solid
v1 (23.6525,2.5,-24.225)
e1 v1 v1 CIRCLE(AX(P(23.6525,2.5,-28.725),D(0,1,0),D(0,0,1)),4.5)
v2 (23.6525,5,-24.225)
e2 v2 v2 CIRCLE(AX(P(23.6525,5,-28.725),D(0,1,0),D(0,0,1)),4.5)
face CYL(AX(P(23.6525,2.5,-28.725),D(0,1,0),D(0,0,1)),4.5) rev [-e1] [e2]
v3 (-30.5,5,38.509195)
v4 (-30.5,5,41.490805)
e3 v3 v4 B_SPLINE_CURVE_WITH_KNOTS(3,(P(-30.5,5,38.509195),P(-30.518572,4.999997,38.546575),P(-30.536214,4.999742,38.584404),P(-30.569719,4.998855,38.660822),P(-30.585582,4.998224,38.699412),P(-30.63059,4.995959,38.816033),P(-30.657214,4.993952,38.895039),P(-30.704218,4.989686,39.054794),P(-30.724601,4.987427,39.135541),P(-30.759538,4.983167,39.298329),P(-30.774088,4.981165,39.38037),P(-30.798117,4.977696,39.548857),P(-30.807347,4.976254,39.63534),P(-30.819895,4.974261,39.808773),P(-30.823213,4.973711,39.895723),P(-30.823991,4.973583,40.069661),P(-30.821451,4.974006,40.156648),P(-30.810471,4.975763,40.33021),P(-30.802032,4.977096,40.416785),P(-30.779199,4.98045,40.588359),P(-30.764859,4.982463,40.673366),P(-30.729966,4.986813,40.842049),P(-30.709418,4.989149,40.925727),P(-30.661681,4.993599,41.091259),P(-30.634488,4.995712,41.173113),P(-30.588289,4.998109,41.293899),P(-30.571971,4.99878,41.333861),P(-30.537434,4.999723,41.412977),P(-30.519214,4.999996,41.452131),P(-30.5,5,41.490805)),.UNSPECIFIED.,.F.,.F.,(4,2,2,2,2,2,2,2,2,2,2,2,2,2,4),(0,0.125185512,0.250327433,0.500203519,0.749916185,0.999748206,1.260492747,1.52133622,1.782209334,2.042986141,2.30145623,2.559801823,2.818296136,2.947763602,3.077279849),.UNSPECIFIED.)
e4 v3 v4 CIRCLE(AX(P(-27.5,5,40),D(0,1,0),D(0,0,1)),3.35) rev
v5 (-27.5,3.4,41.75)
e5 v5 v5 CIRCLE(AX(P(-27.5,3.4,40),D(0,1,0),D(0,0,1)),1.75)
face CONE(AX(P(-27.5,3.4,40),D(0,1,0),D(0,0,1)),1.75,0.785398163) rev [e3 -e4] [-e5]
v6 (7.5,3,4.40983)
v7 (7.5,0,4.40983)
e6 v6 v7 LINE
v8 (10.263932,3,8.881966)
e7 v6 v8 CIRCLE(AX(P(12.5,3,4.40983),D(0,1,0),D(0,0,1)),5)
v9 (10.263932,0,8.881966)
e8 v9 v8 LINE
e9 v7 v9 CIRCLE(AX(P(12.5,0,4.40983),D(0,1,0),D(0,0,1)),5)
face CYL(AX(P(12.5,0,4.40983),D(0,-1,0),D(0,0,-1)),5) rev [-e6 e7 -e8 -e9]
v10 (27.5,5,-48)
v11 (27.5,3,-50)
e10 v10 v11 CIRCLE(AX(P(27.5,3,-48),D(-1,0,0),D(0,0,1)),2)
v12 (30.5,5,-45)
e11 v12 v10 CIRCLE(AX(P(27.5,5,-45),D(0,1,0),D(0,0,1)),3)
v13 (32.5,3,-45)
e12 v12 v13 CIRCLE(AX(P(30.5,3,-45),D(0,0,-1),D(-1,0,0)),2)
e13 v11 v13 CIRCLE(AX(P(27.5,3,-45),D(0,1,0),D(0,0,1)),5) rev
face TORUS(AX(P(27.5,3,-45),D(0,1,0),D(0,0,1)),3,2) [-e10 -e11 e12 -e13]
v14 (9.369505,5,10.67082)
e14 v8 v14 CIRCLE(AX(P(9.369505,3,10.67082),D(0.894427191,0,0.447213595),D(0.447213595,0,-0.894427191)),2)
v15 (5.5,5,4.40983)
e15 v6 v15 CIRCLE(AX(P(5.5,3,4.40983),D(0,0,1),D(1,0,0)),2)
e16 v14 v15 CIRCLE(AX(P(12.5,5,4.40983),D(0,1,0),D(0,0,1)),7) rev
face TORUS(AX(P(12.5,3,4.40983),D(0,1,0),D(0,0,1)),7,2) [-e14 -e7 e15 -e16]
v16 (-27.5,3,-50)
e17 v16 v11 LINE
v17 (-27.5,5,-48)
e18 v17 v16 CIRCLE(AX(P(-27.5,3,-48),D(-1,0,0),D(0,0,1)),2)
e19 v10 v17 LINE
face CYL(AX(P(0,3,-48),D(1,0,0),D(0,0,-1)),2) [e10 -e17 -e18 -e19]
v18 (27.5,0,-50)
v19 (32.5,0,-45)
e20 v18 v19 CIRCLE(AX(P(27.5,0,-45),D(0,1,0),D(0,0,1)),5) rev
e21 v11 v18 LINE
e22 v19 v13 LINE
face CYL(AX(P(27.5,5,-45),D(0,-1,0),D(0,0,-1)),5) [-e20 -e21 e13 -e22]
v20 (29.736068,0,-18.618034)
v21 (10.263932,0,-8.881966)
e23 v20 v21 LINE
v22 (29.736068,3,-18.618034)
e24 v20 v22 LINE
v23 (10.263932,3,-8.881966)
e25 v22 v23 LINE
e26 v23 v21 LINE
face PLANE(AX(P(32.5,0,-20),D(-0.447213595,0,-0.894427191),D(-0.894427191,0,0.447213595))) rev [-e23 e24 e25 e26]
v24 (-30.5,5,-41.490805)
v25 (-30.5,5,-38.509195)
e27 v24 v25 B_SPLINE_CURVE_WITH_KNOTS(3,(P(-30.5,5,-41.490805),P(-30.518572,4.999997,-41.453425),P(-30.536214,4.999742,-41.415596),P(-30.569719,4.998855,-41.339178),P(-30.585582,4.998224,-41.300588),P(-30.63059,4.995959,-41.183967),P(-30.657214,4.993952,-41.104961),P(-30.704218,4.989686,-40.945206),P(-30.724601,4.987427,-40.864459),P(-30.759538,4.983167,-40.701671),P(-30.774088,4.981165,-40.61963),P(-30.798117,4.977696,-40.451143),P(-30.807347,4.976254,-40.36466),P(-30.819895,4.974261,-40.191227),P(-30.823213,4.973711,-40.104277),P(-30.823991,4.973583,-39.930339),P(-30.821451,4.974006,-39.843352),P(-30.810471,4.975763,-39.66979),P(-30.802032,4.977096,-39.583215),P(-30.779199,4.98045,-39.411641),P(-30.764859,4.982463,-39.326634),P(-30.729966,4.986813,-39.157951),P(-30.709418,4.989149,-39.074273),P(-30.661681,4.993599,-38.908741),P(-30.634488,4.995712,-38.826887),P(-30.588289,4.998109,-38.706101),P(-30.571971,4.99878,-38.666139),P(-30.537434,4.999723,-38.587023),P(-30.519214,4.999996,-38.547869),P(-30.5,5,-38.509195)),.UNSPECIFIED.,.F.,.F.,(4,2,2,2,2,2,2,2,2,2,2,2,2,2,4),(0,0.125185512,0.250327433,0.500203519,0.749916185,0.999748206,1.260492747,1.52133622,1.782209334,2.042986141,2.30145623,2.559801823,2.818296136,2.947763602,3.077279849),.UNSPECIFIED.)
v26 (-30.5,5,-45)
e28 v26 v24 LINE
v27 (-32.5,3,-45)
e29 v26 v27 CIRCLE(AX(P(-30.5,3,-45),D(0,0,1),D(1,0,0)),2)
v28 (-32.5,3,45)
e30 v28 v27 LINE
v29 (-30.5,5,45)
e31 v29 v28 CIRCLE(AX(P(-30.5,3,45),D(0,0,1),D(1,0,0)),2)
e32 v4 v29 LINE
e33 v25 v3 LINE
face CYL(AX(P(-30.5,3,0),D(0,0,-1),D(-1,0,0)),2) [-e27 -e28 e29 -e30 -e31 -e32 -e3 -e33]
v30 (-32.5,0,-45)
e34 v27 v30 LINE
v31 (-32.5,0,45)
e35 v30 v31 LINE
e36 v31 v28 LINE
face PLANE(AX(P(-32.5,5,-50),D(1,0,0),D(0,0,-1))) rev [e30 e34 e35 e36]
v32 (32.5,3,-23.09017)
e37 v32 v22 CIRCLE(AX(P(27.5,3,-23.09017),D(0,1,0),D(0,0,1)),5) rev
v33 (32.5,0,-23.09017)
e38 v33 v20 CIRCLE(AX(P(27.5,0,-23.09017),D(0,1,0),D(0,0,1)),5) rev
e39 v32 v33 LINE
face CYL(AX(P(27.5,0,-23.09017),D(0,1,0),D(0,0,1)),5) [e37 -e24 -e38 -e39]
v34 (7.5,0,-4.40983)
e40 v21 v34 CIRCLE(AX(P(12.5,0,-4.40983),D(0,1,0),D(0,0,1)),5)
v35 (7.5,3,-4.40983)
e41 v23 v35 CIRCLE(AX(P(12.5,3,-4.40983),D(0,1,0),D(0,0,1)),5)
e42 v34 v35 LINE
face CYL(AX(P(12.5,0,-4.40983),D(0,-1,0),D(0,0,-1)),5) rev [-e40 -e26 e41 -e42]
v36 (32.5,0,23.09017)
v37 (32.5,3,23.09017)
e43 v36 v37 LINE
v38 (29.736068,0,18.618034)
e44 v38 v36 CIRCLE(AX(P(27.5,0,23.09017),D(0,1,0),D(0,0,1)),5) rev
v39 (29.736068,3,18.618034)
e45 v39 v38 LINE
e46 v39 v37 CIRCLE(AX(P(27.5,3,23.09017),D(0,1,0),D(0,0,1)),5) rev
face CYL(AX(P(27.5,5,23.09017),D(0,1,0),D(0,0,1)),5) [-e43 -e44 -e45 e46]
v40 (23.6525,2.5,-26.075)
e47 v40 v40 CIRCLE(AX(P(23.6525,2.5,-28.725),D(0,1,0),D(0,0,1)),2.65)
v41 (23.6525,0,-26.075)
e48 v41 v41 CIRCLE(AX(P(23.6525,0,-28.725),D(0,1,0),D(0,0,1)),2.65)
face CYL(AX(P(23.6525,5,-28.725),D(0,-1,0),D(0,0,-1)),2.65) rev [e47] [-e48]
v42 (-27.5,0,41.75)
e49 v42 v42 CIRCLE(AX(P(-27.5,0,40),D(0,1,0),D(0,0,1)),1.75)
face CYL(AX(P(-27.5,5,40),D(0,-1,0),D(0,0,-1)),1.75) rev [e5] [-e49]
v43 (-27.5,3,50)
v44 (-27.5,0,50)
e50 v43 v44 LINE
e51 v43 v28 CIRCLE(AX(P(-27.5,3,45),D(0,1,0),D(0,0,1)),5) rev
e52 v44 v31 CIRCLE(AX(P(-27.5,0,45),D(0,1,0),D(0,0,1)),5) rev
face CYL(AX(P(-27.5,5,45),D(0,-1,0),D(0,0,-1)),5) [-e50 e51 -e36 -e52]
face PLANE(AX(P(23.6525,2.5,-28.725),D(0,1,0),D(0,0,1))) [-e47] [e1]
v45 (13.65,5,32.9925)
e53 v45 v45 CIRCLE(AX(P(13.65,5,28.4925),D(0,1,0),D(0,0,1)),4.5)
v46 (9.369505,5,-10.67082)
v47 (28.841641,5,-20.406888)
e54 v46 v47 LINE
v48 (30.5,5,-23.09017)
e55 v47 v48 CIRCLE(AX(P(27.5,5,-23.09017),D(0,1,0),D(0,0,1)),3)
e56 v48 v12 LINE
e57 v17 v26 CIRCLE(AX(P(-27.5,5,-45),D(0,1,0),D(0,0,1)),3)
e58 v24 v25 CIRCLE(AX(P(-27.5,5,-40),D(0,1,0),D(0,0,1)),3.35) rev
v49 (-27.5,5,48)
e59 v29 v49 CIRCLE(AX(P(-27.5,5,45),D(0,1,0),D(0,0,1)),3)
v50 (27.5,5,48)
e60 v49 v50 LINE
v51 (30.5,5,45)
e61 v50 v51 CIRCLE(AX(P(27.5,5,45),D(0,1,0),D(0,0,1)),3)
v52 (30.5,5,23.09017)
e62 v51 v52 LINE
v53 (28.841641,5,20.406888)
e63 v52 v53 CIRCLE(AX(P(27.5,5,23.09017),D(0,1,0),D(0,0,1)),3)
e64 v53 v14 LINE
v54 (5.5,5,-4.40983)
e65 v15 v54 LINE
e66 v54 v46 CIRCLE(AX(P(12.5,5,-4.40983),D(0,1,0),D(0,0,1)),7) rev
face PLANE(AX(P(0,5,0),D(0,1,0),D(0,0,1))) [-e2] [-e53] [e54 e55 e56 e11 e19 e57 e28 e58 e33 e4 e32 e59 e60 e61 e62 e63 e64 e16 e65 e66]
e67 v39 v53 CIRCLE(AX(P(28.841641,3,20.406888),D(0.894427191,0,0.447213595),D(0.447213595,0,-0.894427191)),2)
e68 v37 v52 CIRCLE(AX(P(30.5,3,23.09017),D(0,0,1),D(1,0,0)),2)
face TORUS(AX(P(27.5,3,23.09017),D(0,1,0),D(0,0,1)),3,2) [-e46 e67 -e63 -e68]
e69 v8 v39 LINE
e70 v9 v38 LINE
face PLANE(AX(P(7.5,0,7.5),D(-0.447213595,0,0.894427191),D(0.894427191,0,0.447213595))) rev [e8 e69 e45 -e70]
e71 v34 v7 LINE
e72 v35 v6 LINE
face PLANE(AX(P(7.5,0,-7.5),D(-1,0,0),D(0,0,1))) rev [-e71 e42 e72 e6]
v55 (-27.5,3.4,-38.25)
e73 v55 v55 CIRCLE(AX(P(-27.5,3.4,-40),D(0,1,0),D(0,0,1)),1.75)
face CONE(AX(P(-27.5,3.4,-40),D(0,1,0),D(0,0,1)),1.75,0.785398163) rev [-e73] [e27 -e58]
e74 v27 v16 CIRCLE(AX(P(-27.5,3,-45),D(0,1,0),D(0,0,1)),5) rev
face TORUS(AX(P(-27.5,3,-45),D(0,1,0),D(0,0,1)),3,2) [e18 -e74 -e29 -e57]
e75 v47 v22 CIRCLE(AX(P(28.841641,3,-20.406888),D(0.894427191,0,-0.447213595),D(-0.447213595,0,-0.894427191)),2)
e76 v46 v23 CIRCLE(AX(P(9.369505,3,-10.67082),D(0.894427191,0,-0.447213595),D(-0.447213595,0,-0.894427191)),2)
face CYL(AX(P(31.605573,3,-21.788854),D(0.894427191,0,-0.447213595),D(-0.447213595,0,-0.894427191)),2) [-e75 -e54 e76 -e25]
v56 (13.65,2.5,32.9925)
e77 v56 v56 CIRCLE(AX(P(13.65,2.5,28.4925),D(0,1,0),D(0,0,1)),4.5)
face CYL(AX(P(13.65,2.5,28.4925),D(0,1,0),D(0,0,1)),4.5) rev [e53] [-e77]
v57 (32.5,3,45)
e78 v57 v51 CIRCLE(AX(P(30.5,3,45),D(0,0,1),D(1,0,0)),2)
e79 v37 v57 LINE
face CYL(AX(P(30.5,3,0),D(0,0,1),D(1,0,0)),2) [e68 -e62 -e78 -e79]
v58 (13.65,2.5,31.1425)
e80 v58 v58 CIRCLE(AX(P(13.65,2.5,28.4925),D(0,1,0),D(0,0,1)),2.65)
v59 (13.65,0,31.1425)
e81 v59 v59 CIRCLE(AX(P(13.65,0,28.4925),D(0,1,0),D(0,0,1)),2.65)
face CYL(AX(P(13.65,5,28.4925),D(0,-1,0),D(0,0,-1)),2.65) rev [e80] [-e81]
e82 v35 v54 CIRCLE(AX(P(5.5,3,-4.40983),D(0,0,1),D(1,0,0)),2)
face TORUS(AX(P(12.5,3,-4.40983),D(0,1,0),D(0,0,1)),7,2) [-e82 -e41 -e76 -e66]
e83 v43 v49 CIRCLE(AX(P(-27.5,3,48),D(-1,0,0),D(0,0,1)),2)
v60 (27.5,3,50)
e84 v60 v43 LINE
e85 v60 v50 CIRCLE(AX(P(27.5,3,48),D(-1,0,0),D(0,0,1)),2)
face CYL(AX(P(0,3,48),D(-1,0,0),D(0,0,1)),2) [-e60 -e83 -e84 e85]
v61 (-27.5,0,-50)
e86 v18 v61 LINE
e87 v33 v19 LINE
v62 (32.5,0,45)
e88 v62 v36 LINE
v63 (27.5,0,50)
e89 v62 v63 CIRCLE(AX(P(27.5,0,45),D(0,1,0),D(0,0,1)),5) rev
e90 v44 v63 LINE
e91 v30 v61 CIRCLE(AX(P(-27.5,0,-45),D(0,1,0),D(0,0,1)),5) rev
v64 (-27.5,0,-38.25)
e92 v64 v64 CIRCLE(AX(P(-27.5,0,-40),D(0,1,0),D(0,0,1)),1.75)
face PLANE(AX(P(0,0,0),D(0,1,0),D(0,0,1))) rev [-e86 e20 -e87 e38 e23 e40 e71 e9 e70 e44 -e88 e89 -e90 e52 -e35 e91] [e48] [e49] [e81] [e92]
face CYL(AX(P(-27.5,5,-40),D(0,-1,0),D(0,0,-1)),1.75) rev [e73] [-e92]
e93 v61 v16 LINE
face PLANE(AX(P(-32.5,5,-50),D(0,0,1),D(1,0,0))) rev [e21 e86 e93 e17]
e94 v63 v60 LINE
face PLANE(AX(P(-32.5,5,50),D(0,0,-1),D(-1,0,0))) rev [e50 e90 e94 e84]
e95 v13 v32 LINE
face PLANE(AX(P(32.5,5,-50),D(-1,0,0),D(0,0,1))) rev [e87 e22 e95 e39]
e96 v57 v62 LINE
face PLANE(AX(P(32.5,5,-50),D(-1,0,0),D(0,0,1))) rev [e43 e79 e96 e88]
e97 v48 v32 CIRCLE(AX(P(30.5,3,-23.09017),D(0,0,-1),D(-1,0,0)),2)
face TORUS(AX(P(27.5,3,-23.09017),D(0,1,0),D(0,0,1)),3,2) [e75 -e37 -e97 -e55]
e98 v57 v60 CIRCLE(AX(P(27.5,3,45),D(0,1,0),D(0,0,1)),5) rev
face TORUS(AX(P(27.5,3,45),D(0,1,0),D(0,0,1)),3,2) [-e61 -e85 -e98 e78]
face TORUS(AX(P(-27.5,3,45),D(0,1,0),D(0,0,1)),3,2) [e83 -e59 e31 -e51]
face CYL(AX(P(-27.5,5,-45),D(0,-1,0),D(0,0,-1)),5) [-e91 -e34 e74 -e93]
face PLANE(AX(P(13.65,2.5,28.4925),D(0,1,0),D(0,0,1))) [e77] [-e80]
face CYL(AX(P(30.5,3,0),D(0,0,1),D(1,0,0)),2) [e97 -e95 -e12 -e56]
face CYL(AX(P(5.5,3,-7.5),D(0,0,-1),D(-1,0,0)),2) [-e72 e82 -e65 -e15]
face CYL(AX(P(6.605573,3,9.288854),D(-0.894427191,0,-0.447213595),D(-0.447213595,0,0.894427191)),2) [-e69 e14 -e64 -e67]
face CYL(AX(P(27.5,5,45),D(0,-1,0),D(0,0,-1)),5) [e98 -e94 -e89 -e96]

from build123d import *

# Parameters (mm, degrees)
SKETCH2_W           = 65
SKETCH2_H           = 100
SKETCH2_R           = 1.75
SKETCH2_R_2         = 2.65
BOSS_EXTRUDE1_DEPTH = 5
SKETCH3_R           = 4.5
CUT_EXTRUDE1_DEPTH  = 2.5
FILLET1_R           = 5
CHAMFER1_SIZE       = 1.6
CUT_EXTRUDE2_DEPTH  = 60.843546018
FILLET3_R           = 5
FILLET2_R           = 2


with BuildPart() as part:
    # Sketch2 → Boss-Extrude1 (new body)
    with BuildSketch(Plane(origin=(0, 0, 0), x_dir=(1, 0, 0), z_dir=(0, 1, 0))):
        Rectangle(SKETCH2_W, SKETCH2_H)
        with Locations(Location((-27.5, 40, 0), (0, 0, 270))):
            Circle(SKETCH2_R, mode=Mode.SUBTRACT)
        with Locations(Location((-27.5, -40, 0), (0, 0, 270))):
            Circle(SKETCH2_R, mode=Mode.SUBTRACT)
        with Locations(Location((23.6525, 28.725, 0), (0, 0, 270))):
            Circle(SKETCH2_R_2, mode=Mode.SUBTRACT)
        with Locations(Location((13.65, -28.4925, 0), (0, 0, 270))):
            Circle(SKETCH2_R_2, mode=Mode.SUBTRACT)
    extrude(amount=BOSS_EXTRUDE1_DEPTH)

    # Sketch3 → Cut-Extrude1 (cut)
    with BuildSketch(Plane(origin=(0, 5, 0), x_dir=(1, 0, 0), z_dir=(0, 1, 0))):
        with Locations(Location((23.6525, 28.725, 0), (0, 0, 270))):
            Circle(SKETCH3_R)
        with Locations(Location((13.65, -28.4925, 0), (0, 0, 270))):
            Circle(SKETCH3_R)
    extrude(amount=-CUT_EXTRUDE1_DEPTH, mode=Mode.SUBTRACT)

    # Fillet1
    fillet1_edges = [part.edges().sort_by_distance(p)[0] for p in [
        (32.5, 2.5, 50),
        (-32.5, 2.5, 50),
        (-32.5, 2.5, -50),
        (32.5, 2.5, -50),
    ]]
    fillet(fillet1_edges, radius=FILLET1_R)

    # Chamfer1
    chamfer1_edges = [part.edges().sort_by_distance(p)[0] for p in [
        (-27.5, 5, -41.75),
        (-27.5, 5, 38.25),
    ]]
    chamfer(chamfer1_edges, length=CHAMFER1_SIZE)

    # Sketch4 → Cut-Extrude2 (cut, through all)
    with BuildSketch(Plane(origin=(0, 5, 0), x_dir=(1, 0, 0), z_dir=(0, 1, 0))):
        Polygon((7.5, 7.5), (7.5, -7.5), (32.5, -20), (32.5, 20), align=None)
    extrude(amount=-CUT_EXTRUDE2_DEPTH, mode=Mode.SUBTRACT)

    # Fillet3
    fillet3_edges = [part.edges().sort_by_distance(p)[0] for p in [
        (7.5, 2.5, -7.5),
        (32.5, 2.5, -20),
        (32.5, 2.5, 20),
        (7.5, 2.5, 7.5),
    ]]
    fillet(fillet3_edges, radius=FILLET3_R)

    # Fillet2
    # the kernel refuses this fillet: 2 mm, written as the material it takes off along each edge
    with BuildSketch(Plane(origin=(12.5, 5, 4.409830056), x_dir=(-0.447213595499958, 0, 0.894427190999916), z_dir=(0.894427190999916, 0, 0.447213595499958))) as fillet2_piece_1:
        with BuildLine():
            CenterArc((5 + FILLET2_R, FILLET2_R), FILLET2_R, 180, 90)
            Line((5, FILLET2_R), (5, 0))
            Line((5, 0), (5 + FILLET2_R, 0))
        make_face()
    revolve(axis=Axis((12.5, 5, 4.409830056), (0, -1, 0)), revolution_arc=63.434948823, mode=Mode.SUBTRACT)
    with BuildSketch(Plane(origin=(12.5, 5, -4.409830056), x_dir=(-1, 0, 0), z_dir=(0, 0, 1))) as fillet2_piece_2:
        with BuildLine():
            CenterArc((5 + FILLET2_R, FILLET2_R), FILLET2_R, 180, 90)
            Line((5, FILLET2_R), (5, 0))
            Line((5, 0), (5 + FILLET2_R, 0))
        make_face()
    revolve(axis=Axis((12.5, 5, -4.409830056), (0, -1, 0)), revolution_arc=63.434948823, mode=Mode.SUBTRACT)
    with BuildSketch(Plane(origin=(32.5, 5, 23.090169944), x_dir=(-1, 0, 0), z_dir=(0, 0, 1)), Plane(origin=(32.5, 5, -45), x_dir=(-1, 0, 0), z_dir=(0, 0, 1))) as fillet2_piece_3:
        with BuildLine():
            CenterArc((FILLET2_R, FILLET2_R), FILLET2_R, 180, 90)
            Line((0, FILLET2_R), (0, 0))
            Line((0, 0), (FILLET2_R, 0))
        make_face()
    extrude(amount=21.909830056, mode=Mode.SUBTRACT)
    with BuildSketch(Plane(origin=(27.5, 5, 50), x_dir=(0, 0, -1), z_dir=(-1, 0, 0)), Plane(origin=(-27.5, 5, -50), x_dir=(0, 0, 1), z_dir=(1, 0, 0))) as fillet2_piece_4:
        with BuildLine():
            CenterArc((FILLET2_R, FILLET2_R), FILLET2_R, 180, 90)
            Line((0, FILLET2_R), (0, 0))
            Line((0, 0), (FILLET2_R, 0))
        make_face()
    extrude(amount=55, mode=Mode.SUBTRACT)
    with BuildSketch(Plane(origin=(-32.5, 5, 45), x_dir=(1, 0, 0), z_dir=(0, 0, -1))) as fillet2_piece_5:
        with BuildLine():
            CenterArc((FILLET2_R, FILLET2_R), FILLET2_R, 180, 90)
            Line((0, FILLET2_R), (0, 0))
            Line((0, 0), (FILLET2_R, 0))
        make_face()
    extrude(amount=90, mode=Mode.SUBTRACT)
    with BuildSketch(Plane(origin=(-27.5, 5, 45), x_dir=(-1, 0, 0), z_dir=(0, 0, -1))) as fillet2_piece_6:
        with BuildLine():
            CenterArc((5 - FILLET2_R, -FILLET2_R), FILLET2_R, 0, 90)
            Line((5, -FILLET2_R), (5, 0))
            Line((5, 0), (5 - FILLET2_R, 0))
        make_face()
    revolve(axis=Axis((-27.5, 5, 45), (0, 1, 0)), revolution_arc=90, mode=Mode.SUBTRACT)
    with BuildSketch(Plane(origin=(27.5, 5, -45), x_dir=(0, 0, -1), z_dir=(-1, 0, 0))) as fillet2_piece_7:
        with BuildLine():
            CenterArc((5 - FILLET2_R, FILLET2_R), FILLET2_R, 270, 90)
            Line((5, FILLET2_R), (5, 0))
            Line((5, 0), (5 - FILLET2_R, 0))
        make_face()
    revolve(axis=Axis((27.5, 5, -45), (0, -1, 0)), revolution_arc=90, mode=Mode.SUBTRACT)
    with BuildSketch(Plane(origin=(-27.5, 5, -45), x_dir=(0, 0, -1), z_dir=(1, 0, 0))) as fillet2_piece_8:
        with BuildLine():
            CenterArc((5 - FILLET2_R, -FILLET2_R), FILLET2_R, 0, 90)
            Line((5, -FILLET2_R), (5, 0))
            Line((5, 0), (5 - FILLET2_R, 0))
        make_face()
    revolve(axis=Axis((-27.5, 5, -45), (0, 1, 0)), revolution_arc=90, mode=Mode.SUBTRACT)
    with BuildSketch(Plane(origin=(27.5, 5, 45), x_dir=(1, 0, 0), z_dir=(0, 0, -1))) as fillet2_piece_9:
        with BuildLine():
            CenterArc((5 - FILLET2_R, FILLET2_R), FILLET2_R, 270, 90)
            Line((5, FILLET2_R), (5, 0))
            Line((5, 0), (5 - FILLET2_R, 0))
        make_face()
    revolve(axis=Axis((27.5, 5, 45), (0, -1, 0)), revolution_arc=90, mode=Mode.SUBTRACT)
    with BuildSketch(Plane(origin=(29.736067977, 5, -18.618033989), x_dir=(-0.4472135954999579, 0, -0.8944271909999159), z_dir=(-0.894427190999916, 0, 0.4472135954999579)), Plane(origin=(10.263932023, 5, 8.881966011), x_dir=(-0.4472135954999579, 0, 0.894427190999916), z_dir=(0.894427190999916, 0, 0.4472135954999579))) as fillet2_piece_10:
        with BuildLine():
            CenterArc((FILLET2_R, FILLET2_R), FILLET2_R, 180, 90)
            Line((0, FILLET2_R), (0, 0))
            Line((0, 0), (FILLET2_R, 0))
        make_face()
    extrude(amount=21.770509831, mode=Mode.SUBTRACT)
    with BuildSketch(Plane(origin=(7.5, 5, -4.409830056), x_dir=(-1, 0, 0), z_dir=(0, 0, 1))) as fillet2_piece_11:
        with BuildLine():
            CenterArc((FILLET2_R, FILLET2_R), FILLET2_R, 180, 90)
            Line((0, FILLET2_R), (0, 0))
            Line((0, 0), (FILLET2_R, 0))
        make_face()
    extrude(amount=8.819660113, mode=Mode.SUBTRACT)
    with BuildSketch(Plane(origin=(27.5, 5, 23.090169944), x_dir=(1, 0, 0), z_dir=(0, 0, 1))) as fillet2_piece_12:
        with BuildLine():
            CenterArc((5 - FILLET2_R, -FILLET2_R), FILLET2_R, 0, 90)
            Line((5, -FILLET2_R), (5, 0))
            Line((5, 0), (5 - FILLET2_R, 0))
        make_face()
    revolve(axis=Axis((27.5, 5, 23.090169944), (0, 1, 0)), revolution_arc=63.434948823, mode=Mode.SUBTRACT)
    with BuildSketch(Plane(origin=(27.5, 5, -23.090169944), x_dir=(0.44721359549995743, 0, 0.8944271909999162), z_dir=(-0.8944271909999162, 0, 0.44721359549995743))) as fillet2_piece_13:
        with BuildLine():
            CenterArc((5 - FILLET2_R, -FILLET2_R), FILLET2_R, 0, 90)
            Line((5, -FILLET2_R), (5, 0))
            Line((5, 0), (5 - FILLET2_R, 0))
        make_face()
    revolve(axis=Axis((27.5, 5, -23.090169944), (0, 1, 0)), revolution_arc=63.434948823, mode=Mode.SUBTRACT)


solid = part.part
